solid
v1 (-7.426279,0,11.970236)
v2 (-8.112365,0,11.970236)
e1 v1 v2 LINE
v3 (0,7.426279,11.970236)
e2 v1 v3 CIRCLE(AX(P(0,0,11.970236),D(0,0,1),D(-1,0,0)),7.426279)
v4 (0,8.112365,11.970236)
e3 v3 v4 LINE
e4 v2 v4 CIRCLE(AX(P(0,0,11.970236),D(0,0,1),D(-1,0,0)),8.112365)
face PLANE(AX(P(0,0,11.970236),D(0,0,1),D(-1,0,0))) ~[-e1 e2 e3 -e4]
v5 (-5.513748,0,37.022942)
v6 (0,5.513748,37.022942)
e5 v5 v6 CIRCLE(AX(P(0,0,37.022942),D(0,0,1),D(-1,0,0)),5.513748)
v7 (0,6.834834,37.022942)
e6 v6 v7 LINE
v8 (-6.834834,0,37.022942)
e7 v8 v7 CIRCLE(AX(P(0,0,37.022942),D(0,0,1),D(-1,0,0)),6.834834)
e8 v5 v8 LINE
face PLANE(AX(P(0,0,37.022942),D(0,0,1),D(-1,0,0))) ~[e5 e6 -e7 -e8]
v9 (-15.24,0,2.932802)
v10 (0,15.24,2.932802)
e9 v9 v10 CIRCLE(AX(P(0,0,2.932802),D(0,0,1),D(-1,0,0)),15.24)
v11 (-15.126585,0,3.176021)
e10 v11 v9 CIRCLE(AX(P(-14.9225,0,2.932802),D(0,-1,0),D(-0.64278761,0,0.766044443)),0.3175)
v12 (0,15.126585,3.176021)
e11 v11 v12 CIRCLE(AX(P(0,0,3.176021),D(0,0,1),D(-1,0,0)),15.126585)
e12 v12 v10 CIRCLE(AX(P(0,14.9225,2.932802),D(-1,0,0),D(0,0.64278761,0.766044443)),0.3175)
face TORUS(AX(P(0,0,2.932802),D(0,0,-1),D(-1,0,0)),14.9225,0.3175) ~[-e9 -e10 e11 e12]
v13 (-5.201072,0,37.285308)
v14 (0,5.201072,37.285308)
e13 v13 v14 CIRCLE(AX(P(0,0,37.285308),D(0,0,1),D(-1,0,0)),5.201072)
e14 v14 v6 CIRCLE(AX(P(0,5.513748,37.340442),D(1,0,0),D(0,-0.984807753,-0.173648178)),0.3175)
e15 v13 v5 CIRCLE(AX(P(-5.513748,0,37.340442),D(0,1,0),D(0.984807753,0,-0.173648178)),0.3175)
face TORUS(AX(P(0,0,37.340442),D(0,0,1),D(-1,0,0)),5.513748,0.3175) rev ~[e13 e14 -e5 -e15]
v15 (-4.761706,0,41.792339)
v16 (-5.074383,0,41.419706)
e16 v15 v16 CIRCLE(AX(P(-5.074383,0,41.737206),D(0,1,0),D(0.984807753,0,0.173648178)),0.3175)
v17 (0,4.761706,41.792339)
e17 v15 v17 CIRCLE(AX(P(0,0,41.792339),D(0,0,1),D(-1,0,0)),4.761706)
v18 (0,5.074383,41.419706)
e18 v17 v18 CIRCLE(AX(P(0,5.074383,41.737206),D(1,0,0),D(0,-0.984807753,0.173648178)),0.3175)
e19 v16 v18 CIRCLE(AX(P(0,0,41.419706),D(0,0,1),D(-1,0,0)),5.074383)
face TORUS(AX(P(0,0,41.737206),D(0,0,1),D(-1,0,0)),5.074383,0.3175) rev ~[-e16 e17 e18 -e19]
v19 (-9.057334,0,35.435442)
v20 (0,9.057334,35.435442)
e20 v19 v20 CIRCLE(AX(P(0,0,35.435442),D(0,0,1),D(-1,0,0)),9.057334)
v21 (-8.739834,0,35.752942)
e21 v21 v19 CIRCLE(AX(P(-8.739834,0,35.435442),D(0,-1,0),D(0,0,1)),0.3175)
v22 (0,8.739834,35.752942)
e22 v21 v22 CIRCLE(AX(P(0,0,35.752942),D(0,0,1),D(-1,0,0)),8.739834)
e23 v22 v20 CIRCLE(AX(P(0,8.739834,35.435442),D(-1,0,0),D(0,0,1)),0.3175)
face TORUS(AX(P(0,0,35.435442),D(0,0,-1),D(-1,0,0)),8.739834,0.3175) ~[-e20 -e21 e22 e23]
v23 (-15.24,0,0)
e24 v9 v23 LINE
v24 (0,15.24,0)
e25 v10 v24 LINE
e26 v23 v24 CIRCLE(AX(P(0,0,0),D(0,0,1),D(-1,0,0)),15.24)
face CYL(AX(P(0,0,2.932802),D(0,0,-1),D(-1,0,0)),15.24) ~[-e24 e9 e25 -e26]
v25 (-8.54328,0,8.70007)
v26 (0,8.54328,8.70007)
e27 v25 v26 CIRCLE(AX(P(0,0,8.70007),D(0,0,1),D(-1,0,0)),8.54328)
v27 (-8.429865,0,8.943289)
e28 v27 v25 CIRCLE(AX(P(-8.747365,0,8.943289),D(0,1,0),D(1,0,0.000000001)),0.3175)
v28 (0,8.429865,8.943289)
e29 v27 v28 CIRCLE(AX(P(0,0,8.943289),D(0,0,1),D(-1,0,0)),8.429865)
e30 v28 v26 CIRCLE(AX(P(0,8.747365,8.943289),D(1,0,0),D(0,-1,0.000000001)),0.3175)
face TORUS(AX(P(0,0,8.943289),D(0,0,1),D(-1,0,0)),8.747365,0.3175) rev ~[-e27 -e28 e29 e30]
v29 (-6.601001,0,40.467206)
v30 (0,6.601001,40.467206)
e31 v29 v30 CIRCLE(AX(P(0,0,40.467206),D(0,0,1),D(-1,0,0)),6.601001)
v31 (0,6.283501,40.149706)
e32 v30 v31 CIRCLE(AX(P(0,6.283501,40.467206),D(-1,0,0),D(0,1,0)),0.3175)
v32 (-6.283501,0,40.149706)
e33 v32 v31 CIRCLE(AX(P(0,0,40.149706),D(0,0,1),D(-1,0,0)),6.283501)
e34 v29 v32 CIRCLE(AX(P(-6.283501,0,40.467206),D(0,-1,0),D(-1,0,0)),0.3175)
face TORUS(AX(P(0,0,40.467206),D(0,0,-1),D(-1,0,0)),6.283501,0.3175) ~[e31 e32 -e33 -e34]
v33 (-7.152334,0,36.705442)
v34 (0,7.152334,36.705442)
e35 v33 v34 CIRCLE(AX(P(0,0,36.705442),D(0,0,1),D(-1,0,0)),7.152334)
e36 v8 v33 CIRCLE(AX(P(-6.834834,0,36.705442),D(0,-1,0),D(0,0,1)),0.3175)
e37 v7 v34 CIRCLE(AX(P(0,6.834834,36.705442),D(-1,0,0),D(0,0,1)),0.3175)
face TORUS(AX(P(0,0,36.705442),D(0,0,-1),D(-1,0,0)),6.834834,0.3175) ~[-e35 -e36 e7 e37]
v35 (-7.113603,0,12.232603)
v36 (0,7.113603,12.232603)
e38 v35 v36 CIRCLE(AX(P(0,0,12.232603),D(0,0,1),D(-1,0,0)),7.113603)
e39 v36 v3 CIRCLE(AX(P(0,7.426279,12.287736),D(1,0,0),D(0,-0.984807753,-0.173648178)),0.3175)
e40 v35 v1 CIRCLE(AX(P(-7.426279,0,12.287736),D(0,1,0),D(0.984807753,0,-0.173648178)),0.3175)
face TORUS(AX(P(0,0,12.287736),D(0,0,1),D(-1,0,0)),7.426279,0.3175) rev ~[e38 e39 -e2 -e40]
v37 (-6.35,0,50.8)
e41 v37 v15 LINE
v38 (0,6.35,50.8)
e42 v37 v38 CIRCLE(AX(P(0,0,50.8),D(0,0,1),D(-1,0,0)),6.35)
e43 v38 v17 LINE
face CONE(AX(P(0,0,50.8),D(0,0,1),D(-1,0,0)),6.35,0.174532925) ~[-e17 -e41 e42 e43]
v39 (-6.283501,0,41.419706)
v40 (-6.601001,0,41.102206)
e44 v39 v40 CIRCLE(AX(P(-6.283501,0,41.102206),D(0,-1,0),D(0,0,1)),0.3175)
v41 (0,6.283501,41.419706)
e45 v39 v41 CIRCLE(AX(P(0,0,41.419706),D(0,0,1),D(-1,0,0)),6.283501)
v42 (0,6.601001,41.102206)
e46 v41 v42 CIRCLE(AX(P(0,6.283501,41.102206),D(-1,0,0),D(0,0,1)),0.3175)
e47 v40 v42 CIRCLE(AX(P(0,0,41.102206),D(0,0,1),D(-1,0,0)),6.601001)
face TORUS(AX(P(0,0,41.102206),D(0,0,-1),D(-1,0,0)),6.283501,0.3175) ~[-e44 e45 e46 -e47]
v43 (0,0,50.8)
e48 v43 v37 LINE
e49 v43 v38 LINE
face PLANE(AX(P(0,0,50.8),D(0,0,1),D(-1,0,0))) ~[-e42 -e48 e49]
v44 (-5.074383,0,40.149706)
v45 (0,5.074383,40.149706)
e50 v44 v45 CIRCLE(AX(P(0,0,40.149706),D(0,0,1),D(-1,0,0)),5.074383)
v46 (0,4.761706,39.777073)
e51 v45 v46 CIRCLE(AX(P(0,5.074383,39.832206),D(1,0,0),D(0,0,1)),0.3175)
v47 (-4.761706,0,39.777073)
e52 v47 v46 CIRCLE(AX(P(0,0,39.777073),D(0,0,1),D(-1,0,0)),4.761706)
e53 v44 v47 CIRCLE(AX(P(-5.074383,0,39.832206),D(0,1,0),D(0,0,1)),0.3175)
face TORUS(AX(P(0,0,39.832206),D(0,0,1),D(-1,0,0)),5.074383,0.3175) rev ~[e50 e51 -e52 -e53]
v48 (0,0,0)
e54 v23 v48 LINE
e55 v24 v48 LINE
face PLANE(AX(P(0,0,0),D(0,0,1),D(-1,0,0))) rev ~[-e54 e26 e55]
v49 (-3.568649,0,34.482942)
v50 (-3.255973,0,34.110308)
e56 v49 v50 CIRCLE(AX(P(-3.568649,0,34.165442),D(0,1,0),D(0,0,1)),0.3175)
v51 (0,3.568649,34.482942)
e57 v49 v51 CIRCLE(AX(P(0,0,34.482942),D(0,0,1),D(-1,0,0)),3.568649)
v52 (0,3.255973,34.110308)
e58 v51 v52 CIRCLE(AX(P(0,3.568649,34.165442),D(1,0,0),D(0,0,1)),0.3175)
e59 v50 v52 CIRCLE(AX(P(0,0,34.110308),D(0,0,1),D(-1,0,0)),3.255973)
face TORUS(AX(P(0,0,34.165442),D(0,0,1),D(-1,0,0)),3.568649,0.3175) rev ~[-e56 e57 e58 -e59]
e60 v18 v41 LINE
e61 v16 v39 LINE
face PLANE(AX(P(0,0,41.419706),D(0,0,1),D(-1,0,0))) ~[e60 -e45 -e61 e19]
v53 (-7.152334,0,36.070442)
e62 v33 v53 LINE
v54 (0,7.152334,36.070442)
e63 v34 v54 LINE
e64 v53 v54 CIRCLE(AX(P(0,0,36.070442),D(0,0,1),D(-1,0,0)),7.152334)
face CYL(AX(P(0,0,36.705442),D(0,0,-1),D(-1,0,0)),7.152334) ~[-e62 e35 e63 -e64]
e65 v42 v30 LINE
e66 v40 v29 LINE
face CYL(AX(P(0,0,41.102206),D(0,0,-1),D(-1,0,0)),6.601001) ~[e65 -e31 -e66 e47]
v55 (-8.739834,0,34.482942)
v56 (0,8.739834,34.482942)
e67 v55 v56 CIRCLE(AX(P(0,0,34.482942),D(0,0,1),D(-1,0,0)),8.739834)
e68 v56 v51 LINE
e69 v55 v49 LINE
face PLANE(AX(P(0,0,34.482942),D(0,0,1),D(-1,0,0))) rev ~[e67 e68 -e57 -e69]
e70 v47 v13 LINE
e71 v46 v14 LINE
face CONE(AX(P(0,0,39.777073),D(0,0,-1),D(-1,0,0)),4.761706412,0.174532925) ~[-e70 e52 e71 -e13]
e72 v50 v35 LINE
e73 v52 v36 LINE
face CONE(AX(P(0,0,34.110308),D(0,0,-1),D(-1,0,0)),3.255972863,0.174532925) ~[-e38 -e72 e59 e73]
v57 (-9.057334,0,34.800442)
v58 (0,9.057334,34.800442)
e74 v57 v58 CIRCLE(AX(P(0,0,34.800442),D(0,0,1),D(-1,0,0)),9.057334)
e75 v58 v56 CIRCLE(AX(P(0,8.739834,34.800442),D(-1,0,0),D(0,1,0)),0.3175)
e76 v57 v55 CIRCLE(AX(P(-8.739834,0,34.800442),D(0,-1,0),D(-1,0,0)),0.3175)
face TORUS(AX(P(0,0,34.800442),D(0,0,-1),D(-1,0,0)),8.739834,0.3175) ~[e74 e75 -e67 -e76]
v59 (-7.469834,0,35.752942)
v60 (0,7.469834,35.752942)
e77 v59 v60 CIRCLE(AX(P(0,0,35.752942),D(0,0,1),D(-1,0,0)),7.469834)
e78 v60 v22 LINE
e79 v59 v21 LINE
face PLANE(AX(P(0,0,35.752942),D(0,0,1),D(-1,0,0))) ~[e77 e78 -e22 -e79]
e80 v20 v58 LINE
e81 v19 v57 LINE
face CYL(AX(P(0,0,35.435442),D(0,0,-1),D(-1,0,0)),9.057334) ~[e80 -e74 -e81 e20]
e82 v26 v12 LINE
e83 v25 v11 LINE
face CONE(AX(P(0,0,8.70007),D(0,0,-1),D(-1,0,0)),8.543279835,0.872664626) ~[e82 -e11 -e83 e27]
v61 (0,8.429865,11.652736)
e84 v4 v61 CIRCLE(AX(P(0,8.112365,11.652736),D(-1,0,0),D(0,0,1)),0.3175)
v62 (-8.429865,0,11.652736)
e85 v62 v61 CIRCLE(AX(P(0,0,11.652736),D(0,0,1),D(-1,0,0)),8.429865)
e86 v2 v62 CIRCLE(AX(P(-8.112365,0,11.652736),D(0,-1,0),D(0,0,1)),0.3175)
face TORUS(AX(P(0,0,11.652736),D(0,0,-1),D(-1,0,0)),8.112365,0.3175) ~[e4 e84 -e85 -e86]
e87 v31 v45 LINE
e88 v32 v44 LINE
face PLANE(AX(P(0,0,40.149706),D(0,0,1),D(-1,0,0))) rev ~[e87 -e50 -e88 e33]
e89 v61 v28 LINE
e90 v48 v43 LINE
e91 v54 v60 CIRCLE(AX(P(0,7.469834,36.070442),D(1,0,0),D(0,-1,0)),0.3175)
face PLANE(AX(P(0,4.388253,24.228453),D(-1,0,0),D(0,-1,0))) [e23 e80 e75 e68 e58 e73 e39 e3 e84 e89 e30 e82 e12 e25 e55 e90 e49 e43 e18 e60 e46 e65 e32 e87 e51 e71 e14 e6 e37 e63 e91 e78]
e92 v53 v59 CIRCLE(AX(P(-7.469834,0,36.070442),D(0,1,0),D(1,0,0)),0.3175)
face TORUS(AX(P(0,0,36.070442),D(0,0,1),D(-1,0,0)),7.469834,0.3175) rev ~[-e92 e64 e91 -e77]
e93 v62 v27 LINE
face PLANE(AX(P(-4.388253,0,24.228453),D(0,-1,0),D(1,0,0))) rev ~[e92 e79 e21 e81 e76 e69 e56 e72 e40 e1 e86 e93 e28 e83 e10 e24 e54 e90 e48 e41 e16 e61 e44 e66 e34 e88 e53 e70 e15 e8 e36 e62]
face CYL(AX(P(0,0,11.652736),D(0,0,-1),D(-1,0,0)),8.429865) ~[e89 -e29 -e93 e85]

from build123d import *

# Parameters (mm, degrees)
F1_ANGLE = 270


# Not quite as in the source:
# - a feature of the source that left no trace in its solid (it failed there, or was rolled back) is left out


with BuildPart() as f1:
    # F0 (on Front) → F1 (revolve)
    with BuildSketch(Plane.XZ):
        with BuildLine():
            Line((-15.24, 0), (0, 0))
            Line((0, 0), (0, 50.8))
            Line((0, 50.8), (-6.35, 50.8))
            Line((-6.35, 50.8), (-4.7617064118, 41.792339449))
            ThreePointArc((-4.7617064118, 41.792339449), (-4.8311637627, 41.5331210865), (-5.0743828734, 41.4197061526))
            Line((-5.0743828734, 41.4197061526), (-6.2835011077, 41.4197061526))
            ThreePointArc((-6.2835011077, 41.4197061526), (-6.5080075107, 41.3267125556), (-6.6010011077, 41.1022061526))
            Line((-6.6010011077, 41.1022061526), (-6.6010011077, 40.4672061526))
            ThreePointArc((-6.6010011077, 40.4672061526), (-6.5080075107, 40.2426997495), (-6.2835011077, 40.1497061526))
            Line((-6.2835011077, 40.1497061526), (-5.0743828734, 40.1497061526))
            ThreePointArc((-5.0743828734, 40.1497061526), (-4.8311637627, 40.0362912186), (-4.7617064118, 39.7770728561))
            Line((-4.7617064118, 39.7770728561), (-5.2010717431, 37.2853082403))
            ThreePointArc((-5.2010717431, 37.2853082403), (-5.3096631386, 37.0972224261), (-5.5137482047, 37.0229415367))
            Line((-5.5137482047, 37.0229415367), (-6.8348340718, 37.0229415367))
            ThreePointArc((-6.8348340718, 37.0229415367), (-7.0593404748, 36.9299479398), (-7.1523340718, 36.7054415367))
            Line((-7.1523340718, 36.7054415367), (-7.1523340718, 36.0704415367))
            ThreePointArc((-7.1523340718, 36.0704415367), (-7.2453276688, 35.8459351337), (-7.4698340718, 35.7529415367))
            Line((-7.4698340718, 35.7529415367), (-8.7398340718, 35.7529415367))
            ThreePointArc((-8.7398340718, 35.7529415367), (-8.9643404748, 35.6599479398), (-9.0573340718, 35.4354415367))
            Line((-9.0573340718, 35.4354415367), (-9.0573340718, 34.8004415367))
            ThreePointArc((-9.0573340718, 34.8004415367), (-8.9643404748, 34.5759351337), (-8.7398340718, 34.4829415367))
            Line((-8.7398340718, 34.4829415367), (-3.5686493249, 34.4829415367))
            ThreePointArc((-3.5686493249, 34.4829415367), (-3.3254302142, 34.3695266028), (-3.2559728633, 34.1103082403))
            Line((-3.2559728633, 34.1103082403), (-7.113602572, 12.2326030065))
            ThreePointArc((-7.113602572, 12.2326030065), (-7.2221939675, 12.0445171922), (-7.4262790336, 11.9702363029))
            Line((-7.4262790336, 11.9702363029), (-8.1123649007, 11.9702363029))
            ThreePointArc((-8.1123649007, 11.9702363029), (-8.3368713037, 11.8772427059), (-8.4298649007, 11.6527363029))
            Line((-8.4298649007, 11.6527363029), (-8.4298649007, 8.9432889844))
            ThreePointArc((-8.4298649007, 8.9432889844), (-8.4596121783, 8.8091076862), (-8.5432798346, 8.7000698737))
            Line((-8.5432798346, 8.7000698737), (-15.1265850661, 3.176020882))
            ThreePointArc((-15.1265850661, 3.176020882), (-15.2102527224, 3.0669830694), (-15.24, 2.9328017713))
            Line((-15.24, 2.9328017713), (-15.24, 0))
        make_face()
    revolve(axis=Axis((0, 0, 25.4), (0, 0, 1)), revolution_arc=F1_ANGLE)


solid = f1.part
